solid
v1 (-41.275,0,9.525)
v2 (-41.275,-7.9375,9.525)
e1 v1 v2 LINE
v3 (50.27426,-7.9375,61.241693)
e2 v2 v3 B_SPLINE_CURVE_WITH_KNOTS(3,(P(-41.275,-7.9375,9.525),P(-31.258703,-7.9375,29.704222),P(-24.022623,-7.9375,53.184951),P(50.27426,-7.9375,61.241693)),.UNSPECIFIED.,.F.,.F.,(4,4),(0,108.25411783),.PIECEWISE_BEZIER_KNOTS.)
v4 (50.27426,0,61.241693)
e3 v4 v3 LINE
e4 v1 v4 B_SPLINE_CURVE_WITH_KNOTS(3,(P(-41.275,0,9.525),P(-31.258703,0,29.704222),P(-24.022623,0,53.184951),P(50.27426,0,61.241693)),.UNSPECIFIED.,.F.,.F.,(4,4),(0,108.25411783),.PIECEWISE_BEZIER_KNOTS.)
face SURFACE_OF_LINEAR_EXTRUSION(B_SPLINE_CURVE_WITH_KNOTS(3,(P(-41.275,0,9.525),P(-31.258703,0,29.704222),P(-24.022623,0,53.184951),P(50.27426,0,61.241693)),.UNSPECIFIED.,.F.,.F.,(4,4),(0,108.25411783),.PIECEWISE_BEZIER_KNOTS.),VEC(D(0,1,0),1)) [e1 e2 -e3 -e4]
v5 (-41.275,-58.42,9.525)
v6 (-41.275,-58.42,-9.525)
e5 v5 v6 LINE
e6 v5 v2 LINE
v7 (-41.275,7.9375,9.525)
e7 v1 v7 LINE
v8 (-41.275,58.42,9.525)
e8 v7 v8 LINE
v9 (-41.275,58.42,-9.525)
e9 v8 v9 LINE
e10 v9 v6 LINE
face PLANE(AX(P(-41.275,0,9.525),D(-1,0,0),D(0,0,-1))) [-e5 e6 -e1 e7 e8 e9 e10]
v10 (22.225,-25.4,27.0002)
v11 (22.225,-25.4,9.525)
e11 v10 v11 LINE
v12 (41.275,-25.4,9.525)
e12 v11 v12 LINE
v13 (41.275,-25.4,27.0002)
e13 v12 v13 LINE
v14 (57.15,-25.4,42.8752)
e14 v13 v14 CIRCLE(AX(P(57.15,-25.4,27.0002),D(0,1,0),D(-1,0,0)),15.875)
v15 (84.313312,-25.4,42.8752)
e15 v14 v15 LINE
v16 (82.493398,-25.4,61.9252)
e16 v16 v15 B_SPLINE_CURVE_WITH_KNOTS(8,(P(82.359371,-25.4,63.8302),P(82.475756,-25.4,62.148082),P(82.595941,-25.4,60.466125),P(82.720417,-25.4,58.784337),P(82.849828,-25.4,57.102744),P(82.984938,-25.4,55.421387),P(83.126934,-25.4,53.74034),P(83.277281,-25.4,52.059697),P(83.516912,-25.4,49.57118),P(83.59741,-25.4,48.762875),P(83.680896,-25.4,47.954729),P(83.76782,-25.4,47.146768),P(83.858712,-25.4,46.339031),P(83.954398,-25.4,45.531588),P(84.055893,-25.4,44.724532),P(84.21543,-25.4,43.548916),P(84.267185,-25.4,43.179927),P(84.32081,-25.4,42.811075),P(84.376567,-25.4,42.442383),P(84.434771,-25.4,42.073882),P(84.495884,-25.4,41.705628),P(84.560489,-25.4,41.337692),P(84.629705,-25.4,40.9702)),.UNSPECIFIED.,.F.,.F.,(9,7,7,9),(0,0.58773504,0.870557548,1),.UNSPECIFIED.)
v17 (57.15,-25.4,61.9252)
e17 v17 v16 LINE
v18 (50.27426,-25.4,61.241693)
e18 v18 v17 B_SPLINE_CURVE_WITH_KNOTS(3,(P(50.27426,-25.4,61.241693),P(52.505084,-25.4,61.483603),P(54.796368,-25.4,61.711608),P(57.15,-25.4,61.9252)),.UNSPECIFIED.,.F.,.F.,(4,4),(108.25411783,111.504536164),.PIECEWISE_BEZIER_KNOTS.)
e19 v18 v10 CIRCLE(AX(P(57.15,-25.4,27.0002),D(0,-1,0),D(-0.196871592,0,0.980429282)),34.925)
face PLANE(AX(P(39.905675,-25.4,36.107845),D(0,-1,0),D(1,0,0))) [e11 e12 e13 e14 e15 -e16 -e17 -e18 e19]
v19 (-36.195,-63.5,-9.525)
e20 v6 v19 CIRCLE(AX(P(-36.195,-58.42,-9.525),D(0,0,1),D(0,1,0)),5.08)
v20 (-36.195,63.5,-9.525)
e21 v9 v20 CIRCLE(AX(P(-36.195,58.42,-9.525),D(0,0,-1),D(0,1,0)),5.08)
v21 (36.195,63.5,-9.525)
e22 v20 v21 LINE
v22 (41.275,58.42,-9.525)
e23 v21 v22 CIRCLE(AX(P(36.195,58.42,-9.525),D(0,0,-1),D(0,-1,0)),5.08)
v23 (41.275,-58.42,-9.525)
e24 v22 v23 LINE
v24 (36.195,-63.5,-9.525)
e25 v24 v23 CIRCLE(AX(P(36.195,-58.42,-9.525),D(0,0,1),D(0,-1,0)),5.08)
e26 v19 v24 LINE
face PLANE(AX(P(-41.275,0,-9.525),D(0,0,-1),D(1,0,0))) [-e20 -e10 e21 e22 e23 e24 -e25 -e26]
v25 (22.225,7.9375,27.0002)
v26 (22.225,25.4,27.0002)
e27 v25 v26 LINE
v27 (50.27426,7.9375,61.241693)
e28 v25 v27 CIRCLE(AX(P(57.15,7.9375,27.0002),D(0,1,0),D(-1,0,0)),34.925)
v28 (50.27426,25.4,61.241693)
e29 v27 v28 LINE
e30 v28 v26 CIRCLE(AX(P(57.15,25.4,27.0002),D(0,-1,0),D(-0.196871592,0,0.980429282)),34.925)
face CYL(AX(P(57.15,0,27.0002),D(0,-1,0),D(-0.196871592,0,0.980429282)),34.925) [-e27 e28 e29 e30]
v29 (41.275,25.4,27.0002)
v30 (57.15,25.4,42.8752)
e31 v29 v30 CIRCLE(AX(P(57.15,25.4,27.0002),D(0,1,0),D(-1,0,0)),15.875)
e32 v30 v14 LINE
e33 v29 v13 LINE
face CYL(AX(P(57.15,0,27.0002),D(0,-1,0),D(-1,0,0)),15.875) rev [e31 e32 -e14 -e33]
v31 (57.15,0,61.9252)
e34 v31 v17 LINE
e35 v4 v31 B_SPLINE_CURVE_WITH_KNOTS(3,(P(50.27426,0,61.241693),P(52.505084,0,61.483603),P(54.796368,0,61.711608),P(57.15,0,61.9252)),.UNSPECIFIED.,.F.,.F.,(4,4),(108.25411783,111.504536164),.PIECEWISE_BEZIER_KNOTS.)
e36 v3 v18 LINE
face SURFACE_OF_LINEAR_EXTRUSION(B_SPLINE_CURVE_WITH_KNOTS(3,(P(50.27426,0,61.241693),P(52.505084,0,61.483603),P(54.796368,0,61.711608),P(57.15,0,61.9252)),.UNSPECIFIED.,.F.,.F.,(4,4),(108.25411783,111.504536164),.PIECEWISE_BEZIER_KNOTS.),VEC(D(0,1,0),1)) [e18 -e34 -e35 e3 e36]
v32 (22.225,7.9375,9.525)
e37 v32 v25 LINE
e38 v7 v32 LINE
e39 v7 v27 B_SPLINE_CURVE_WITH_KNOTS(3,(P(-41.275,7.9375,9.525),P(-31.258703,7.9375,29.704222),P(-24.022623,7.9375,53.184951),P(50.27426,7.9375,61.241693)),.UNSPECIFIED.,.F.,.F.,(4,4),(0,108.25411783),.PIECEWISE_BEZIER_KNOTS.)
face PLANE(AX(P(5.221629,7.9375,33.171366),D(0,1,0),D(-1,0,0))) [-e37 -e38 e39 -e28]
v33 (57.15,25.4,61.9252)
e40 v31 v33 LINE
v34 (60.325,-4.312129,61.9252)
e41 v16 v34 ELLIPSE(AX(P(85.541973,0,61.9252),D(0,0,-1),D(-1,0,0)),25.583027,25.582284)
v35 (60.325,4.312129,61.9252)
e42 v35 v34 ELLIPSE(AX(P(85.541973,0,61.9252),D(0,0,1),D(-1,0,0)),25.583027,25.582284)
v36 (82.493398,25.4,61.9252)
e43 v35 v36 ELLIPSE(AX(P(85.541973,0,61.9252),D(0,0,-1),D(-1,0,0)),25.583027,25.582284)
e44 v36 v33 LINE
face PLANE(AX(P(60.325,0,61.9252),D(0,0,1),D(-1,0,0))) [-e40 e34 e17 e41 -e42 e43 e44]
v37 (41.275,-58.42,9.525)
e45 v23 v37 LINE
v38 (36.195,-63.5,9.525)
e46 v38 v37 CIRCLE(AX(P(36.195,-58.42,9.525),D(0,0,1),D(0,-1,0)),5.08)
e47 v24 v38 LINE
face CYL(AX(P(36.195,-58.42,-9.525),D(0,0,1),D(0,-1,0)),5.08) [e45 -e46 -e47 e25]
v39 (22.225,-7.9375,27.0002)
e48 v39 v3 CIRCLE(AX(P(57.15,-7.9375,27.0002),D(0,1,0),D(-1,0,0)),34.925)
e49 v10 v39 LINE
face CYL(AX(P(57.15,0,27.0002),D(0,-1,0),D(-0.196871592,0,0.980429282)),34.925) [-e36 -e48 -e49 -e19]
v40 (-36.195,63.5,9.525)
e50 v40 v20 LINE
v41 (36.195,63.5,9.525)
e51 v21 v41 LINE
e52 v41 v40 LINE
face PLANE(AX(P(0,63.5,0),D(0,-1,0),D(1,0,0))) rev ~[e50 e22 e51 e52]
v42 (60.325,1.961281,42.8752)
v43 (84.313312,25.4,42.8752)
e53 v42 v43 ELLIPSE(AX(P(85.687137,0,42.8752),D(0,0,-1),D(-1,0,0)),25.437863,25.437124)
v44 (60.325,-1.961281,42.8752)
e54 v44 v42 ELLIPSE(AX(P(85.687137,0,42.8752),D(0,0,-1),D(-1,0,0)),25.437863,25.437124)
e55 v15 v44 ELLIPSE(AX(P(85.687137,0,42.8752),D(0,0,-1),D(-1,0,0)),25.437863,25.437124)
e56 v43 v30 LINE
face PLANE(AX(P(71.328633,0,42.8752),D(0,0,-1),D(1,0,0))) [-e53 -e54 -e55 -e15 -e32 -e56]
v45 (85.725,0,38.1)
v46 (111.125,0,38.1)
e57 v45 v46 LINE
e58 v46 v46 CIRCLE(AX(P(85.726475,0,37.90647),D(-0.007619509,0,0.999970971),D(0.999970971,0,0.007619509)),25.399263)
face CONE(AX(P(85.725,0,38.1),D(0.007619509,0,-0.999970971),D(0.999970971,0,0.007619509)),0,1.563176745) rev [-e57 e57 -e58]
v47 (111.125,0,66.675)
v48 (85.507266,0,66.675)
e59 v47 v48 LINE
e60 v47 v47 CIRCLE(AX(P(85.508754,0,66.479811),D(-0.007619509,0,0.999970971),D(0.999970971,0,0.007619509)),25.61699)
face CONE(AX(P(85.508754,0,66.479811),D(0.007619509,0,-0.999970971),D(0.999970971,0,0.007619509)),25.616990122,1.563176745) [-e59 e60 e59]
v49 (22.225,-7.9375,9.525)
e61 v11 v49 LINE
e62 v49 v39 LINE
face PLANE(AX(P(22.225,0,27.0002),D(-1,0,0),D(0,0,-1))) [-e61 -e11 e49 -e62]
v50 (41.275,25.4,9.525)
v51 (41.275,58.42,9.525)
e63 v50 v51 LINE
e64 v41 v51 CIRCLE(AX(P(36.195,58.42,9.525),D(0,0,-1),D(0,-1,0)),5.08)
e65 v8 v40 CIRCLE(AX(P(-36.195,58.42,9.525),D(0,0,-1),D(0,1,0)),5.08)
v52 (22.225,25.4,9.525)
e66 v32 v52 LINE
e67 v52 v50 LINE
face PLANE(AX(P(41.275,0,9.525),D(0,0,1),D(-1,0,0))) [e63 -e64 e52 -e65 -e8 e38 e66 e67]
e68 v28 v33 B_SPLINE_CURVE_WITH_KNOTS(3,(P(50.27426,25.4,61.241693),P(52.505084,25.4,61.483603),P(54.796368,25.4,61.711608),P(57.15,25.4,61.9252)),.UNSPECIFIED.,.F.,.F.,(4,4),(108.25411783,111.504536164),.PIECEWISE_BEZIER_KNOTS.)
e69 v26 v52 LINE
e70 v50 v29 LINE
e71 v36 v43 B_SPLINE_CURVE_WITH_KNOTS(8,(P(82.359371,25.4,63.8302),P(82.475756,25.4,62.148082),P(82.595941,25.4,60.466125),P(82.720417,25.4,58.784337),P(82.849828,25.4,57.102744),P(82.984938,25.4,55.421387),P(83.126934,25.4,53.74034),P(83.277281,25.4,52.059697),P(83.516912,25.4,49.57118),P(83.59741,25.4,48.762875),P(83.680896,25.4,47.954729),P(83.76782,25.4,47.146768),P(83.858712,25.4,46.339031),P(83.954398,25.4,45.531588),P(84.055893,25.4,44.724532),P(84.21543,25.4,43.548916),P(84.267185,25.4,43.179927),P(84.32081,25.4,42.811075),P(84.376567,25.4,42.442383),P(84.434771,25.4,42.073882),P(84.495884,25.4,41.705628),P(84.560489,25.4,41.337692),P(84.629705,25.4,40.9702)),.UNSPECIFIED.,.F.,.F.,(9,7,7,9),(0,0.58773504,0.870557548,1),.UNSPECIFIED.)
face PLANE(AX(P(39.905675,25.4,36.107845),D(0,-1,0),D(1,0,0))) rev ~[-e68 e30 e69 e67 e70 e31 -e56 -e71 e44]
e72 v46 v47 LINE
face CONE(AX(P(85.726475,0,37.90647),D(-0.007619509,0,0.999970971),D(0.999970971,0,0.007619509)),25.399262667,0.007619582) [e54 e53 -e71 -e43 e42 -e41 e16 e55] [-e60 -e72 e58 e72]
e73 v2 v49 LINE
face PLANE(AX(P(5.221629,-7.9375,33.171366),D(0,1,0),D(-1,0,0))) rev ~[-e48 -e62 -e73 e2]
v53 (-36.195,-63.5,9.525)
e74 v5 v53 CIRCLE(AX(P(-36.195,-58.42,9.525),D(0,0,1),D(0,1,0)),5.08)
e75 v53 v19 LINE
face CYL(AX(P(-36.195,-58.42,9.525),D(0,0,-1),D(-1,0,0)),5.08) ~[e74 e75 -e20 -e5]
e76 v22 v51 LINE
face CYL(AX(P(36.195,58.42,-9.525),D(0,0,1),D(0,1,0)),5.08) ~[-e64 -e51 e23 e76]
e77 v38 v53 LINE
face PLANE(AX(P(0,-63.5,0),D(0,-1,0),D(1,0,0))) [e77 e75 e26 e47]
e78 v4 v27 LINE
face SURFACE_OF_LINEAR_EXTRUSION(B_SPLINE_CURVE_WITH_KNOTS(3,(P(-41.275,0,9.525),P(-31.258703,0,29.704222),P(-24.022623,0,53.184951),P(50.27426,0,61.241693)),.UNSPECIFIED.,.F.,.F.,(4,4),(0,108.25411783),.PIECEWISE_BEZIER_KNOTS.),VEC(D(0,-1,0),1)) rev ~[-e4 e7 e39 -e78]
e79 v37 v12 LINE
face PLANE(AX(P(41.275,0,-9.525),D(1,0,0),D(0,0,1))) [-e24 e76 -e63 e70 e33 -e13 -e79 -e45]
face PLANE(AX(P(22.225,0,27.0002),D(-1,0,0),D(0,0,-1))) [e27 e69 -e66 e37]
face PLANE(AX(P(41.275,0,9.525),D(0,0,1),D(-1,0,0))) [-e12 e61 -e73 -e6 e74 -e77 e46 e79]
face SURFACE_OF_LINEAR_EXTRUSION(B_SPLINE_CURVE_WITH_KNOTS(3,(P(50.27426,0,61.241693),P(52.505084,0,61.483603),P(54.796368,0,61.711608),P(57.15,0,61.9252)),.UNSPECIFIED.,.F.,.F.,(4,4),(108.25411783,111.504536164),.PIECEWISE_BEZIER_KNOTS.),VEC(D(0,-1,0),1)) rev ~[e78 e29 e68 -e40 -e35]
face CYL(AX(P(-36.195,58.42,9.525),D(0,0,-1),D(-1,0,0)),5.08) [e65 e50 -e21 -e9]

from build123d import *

# Parameters (mm, degrees)
F1_DEPTH  = 63.5
F2_DEPTH  = 25.4
F4_E5_0_W = 28.3572662234
F4_E5_0_H = 50.8
F5_DEPTH  = 19.05
F6_DEPTH  = 7.9375
F7_R      = 5.08


with BuildPart() as f1:
    # F0 (on Front) → F1 (new body, symmetric)
    with BuildSketch(Plane.XZ):
        Polygon((-41.275, 9.525), (-41.275, -9.525), (41.275, -9.525), (41.275, 9.525), (22.225, 9.525), align=None)
    extrude(amount=F1_DEPTH, both=True)

    # F0 (on Front) → F2 (join, symmetric)
    with BuildSketch(Plane.XZ):
        with BuildLine():
            Line((22.225, 9.525), (41.275, 9.525))
            Line((41.275, 9.525), (41.275, 27.0002))
            ThreePointArc((41.275, 27.0002), (45.9246798487, 38.2255201513), (57.15, 42.8752))
            Line((57.15, 42.8752), (60.325, 42.8752))
            Line((60.325, 42.8752), (60.325, 61.9252))
            Line((60.325, 61.9252), (57.15, 61.9252))
            add(Edge.make_bspline(
                [(50.2742596594, 61.2416926627), (52.505084267, 61.4836028987), (54.7963675205, 61.7116076427), (57.15, 61.9252)],
                knots=[108.25411783, 108.25411783, 108.25411783, 108.25411783, 111.5045361635, 111.5045361635, 111.5045361635, 111.5045361635], degree=3))
            ThreePointArc((50.2742596594, 61.2416926627), (30.1324977432, 49.1318559887), (22.225, 27.0002))
            Line((22.225, 27.0002), (22.225, 9.525))
        make_face()
    extrude(amount=F2_DEPTH, both=True)

    # F0 (on Front) → F3 (revolve)
    with BuildSketch(Plane.XZ):
        Polygon((85.5072662234, 66.675), (85.6886142667, 42.8752), (85.725, 38.1), (111.125, 38.1), (111.125, 66.675), align=None)
    revolve(axis=Axis((85.6161331117, 0, 52.3875), (-0.0076195085, 0, 0.9999709711)))

    # F4_E5_0 (on explicit) → F5 (join)
    with BuildSketch(Plane(origin=(57.15, 25.4, 61.9252), x_dir=(1, 0, 0), z_dir=(0, 0, -1))):
        with Locations((14.1786331117, 25.4)):
            Rectangle(F4_E5_0_W, F4_E5_0_H)
    extrude(amount=F5_DEPTH)

    # F0 (on Front) → F6 (join, symmetric)
    with BuildSketch(Plane.XZ):
        with BuildLine():
            add(Edge.make_bspline(
                [(-41.275, 9.525), (-31.2587030045, 29.7042218625), (-24.022623126, 53.1849514965), (50.2742596594, 61.2416926627)],
                knots=[0, 0, 0, 0, 108.25411783, 108.25411783, 108.25411783, 108.25411783], degree=3))
            Line((-41.275, 9.525), (22.225, 9.525))
            Line((22.225, 9.525), (22.225, 27.0002))
            ThreePointArc((22.225, 27.0002), (30.1324977432, 49.1318559887), (50.2742596594, 61.2416926627))
        make_face()
    extrude(amount=F6_DEPTH, both=True)

    # F7
    f7_edges = [f1.edges().sort_by_distance(p)[0] for p in [
        (41.275, -63.5, 0),
        (-41.275, -63.5, 0),
        (-41.275, 63.5, 0),
        (41.275, 63.5, 0),
    ]]
    fillet(f7_edges, radius=F7_R)


solid = f1.part
